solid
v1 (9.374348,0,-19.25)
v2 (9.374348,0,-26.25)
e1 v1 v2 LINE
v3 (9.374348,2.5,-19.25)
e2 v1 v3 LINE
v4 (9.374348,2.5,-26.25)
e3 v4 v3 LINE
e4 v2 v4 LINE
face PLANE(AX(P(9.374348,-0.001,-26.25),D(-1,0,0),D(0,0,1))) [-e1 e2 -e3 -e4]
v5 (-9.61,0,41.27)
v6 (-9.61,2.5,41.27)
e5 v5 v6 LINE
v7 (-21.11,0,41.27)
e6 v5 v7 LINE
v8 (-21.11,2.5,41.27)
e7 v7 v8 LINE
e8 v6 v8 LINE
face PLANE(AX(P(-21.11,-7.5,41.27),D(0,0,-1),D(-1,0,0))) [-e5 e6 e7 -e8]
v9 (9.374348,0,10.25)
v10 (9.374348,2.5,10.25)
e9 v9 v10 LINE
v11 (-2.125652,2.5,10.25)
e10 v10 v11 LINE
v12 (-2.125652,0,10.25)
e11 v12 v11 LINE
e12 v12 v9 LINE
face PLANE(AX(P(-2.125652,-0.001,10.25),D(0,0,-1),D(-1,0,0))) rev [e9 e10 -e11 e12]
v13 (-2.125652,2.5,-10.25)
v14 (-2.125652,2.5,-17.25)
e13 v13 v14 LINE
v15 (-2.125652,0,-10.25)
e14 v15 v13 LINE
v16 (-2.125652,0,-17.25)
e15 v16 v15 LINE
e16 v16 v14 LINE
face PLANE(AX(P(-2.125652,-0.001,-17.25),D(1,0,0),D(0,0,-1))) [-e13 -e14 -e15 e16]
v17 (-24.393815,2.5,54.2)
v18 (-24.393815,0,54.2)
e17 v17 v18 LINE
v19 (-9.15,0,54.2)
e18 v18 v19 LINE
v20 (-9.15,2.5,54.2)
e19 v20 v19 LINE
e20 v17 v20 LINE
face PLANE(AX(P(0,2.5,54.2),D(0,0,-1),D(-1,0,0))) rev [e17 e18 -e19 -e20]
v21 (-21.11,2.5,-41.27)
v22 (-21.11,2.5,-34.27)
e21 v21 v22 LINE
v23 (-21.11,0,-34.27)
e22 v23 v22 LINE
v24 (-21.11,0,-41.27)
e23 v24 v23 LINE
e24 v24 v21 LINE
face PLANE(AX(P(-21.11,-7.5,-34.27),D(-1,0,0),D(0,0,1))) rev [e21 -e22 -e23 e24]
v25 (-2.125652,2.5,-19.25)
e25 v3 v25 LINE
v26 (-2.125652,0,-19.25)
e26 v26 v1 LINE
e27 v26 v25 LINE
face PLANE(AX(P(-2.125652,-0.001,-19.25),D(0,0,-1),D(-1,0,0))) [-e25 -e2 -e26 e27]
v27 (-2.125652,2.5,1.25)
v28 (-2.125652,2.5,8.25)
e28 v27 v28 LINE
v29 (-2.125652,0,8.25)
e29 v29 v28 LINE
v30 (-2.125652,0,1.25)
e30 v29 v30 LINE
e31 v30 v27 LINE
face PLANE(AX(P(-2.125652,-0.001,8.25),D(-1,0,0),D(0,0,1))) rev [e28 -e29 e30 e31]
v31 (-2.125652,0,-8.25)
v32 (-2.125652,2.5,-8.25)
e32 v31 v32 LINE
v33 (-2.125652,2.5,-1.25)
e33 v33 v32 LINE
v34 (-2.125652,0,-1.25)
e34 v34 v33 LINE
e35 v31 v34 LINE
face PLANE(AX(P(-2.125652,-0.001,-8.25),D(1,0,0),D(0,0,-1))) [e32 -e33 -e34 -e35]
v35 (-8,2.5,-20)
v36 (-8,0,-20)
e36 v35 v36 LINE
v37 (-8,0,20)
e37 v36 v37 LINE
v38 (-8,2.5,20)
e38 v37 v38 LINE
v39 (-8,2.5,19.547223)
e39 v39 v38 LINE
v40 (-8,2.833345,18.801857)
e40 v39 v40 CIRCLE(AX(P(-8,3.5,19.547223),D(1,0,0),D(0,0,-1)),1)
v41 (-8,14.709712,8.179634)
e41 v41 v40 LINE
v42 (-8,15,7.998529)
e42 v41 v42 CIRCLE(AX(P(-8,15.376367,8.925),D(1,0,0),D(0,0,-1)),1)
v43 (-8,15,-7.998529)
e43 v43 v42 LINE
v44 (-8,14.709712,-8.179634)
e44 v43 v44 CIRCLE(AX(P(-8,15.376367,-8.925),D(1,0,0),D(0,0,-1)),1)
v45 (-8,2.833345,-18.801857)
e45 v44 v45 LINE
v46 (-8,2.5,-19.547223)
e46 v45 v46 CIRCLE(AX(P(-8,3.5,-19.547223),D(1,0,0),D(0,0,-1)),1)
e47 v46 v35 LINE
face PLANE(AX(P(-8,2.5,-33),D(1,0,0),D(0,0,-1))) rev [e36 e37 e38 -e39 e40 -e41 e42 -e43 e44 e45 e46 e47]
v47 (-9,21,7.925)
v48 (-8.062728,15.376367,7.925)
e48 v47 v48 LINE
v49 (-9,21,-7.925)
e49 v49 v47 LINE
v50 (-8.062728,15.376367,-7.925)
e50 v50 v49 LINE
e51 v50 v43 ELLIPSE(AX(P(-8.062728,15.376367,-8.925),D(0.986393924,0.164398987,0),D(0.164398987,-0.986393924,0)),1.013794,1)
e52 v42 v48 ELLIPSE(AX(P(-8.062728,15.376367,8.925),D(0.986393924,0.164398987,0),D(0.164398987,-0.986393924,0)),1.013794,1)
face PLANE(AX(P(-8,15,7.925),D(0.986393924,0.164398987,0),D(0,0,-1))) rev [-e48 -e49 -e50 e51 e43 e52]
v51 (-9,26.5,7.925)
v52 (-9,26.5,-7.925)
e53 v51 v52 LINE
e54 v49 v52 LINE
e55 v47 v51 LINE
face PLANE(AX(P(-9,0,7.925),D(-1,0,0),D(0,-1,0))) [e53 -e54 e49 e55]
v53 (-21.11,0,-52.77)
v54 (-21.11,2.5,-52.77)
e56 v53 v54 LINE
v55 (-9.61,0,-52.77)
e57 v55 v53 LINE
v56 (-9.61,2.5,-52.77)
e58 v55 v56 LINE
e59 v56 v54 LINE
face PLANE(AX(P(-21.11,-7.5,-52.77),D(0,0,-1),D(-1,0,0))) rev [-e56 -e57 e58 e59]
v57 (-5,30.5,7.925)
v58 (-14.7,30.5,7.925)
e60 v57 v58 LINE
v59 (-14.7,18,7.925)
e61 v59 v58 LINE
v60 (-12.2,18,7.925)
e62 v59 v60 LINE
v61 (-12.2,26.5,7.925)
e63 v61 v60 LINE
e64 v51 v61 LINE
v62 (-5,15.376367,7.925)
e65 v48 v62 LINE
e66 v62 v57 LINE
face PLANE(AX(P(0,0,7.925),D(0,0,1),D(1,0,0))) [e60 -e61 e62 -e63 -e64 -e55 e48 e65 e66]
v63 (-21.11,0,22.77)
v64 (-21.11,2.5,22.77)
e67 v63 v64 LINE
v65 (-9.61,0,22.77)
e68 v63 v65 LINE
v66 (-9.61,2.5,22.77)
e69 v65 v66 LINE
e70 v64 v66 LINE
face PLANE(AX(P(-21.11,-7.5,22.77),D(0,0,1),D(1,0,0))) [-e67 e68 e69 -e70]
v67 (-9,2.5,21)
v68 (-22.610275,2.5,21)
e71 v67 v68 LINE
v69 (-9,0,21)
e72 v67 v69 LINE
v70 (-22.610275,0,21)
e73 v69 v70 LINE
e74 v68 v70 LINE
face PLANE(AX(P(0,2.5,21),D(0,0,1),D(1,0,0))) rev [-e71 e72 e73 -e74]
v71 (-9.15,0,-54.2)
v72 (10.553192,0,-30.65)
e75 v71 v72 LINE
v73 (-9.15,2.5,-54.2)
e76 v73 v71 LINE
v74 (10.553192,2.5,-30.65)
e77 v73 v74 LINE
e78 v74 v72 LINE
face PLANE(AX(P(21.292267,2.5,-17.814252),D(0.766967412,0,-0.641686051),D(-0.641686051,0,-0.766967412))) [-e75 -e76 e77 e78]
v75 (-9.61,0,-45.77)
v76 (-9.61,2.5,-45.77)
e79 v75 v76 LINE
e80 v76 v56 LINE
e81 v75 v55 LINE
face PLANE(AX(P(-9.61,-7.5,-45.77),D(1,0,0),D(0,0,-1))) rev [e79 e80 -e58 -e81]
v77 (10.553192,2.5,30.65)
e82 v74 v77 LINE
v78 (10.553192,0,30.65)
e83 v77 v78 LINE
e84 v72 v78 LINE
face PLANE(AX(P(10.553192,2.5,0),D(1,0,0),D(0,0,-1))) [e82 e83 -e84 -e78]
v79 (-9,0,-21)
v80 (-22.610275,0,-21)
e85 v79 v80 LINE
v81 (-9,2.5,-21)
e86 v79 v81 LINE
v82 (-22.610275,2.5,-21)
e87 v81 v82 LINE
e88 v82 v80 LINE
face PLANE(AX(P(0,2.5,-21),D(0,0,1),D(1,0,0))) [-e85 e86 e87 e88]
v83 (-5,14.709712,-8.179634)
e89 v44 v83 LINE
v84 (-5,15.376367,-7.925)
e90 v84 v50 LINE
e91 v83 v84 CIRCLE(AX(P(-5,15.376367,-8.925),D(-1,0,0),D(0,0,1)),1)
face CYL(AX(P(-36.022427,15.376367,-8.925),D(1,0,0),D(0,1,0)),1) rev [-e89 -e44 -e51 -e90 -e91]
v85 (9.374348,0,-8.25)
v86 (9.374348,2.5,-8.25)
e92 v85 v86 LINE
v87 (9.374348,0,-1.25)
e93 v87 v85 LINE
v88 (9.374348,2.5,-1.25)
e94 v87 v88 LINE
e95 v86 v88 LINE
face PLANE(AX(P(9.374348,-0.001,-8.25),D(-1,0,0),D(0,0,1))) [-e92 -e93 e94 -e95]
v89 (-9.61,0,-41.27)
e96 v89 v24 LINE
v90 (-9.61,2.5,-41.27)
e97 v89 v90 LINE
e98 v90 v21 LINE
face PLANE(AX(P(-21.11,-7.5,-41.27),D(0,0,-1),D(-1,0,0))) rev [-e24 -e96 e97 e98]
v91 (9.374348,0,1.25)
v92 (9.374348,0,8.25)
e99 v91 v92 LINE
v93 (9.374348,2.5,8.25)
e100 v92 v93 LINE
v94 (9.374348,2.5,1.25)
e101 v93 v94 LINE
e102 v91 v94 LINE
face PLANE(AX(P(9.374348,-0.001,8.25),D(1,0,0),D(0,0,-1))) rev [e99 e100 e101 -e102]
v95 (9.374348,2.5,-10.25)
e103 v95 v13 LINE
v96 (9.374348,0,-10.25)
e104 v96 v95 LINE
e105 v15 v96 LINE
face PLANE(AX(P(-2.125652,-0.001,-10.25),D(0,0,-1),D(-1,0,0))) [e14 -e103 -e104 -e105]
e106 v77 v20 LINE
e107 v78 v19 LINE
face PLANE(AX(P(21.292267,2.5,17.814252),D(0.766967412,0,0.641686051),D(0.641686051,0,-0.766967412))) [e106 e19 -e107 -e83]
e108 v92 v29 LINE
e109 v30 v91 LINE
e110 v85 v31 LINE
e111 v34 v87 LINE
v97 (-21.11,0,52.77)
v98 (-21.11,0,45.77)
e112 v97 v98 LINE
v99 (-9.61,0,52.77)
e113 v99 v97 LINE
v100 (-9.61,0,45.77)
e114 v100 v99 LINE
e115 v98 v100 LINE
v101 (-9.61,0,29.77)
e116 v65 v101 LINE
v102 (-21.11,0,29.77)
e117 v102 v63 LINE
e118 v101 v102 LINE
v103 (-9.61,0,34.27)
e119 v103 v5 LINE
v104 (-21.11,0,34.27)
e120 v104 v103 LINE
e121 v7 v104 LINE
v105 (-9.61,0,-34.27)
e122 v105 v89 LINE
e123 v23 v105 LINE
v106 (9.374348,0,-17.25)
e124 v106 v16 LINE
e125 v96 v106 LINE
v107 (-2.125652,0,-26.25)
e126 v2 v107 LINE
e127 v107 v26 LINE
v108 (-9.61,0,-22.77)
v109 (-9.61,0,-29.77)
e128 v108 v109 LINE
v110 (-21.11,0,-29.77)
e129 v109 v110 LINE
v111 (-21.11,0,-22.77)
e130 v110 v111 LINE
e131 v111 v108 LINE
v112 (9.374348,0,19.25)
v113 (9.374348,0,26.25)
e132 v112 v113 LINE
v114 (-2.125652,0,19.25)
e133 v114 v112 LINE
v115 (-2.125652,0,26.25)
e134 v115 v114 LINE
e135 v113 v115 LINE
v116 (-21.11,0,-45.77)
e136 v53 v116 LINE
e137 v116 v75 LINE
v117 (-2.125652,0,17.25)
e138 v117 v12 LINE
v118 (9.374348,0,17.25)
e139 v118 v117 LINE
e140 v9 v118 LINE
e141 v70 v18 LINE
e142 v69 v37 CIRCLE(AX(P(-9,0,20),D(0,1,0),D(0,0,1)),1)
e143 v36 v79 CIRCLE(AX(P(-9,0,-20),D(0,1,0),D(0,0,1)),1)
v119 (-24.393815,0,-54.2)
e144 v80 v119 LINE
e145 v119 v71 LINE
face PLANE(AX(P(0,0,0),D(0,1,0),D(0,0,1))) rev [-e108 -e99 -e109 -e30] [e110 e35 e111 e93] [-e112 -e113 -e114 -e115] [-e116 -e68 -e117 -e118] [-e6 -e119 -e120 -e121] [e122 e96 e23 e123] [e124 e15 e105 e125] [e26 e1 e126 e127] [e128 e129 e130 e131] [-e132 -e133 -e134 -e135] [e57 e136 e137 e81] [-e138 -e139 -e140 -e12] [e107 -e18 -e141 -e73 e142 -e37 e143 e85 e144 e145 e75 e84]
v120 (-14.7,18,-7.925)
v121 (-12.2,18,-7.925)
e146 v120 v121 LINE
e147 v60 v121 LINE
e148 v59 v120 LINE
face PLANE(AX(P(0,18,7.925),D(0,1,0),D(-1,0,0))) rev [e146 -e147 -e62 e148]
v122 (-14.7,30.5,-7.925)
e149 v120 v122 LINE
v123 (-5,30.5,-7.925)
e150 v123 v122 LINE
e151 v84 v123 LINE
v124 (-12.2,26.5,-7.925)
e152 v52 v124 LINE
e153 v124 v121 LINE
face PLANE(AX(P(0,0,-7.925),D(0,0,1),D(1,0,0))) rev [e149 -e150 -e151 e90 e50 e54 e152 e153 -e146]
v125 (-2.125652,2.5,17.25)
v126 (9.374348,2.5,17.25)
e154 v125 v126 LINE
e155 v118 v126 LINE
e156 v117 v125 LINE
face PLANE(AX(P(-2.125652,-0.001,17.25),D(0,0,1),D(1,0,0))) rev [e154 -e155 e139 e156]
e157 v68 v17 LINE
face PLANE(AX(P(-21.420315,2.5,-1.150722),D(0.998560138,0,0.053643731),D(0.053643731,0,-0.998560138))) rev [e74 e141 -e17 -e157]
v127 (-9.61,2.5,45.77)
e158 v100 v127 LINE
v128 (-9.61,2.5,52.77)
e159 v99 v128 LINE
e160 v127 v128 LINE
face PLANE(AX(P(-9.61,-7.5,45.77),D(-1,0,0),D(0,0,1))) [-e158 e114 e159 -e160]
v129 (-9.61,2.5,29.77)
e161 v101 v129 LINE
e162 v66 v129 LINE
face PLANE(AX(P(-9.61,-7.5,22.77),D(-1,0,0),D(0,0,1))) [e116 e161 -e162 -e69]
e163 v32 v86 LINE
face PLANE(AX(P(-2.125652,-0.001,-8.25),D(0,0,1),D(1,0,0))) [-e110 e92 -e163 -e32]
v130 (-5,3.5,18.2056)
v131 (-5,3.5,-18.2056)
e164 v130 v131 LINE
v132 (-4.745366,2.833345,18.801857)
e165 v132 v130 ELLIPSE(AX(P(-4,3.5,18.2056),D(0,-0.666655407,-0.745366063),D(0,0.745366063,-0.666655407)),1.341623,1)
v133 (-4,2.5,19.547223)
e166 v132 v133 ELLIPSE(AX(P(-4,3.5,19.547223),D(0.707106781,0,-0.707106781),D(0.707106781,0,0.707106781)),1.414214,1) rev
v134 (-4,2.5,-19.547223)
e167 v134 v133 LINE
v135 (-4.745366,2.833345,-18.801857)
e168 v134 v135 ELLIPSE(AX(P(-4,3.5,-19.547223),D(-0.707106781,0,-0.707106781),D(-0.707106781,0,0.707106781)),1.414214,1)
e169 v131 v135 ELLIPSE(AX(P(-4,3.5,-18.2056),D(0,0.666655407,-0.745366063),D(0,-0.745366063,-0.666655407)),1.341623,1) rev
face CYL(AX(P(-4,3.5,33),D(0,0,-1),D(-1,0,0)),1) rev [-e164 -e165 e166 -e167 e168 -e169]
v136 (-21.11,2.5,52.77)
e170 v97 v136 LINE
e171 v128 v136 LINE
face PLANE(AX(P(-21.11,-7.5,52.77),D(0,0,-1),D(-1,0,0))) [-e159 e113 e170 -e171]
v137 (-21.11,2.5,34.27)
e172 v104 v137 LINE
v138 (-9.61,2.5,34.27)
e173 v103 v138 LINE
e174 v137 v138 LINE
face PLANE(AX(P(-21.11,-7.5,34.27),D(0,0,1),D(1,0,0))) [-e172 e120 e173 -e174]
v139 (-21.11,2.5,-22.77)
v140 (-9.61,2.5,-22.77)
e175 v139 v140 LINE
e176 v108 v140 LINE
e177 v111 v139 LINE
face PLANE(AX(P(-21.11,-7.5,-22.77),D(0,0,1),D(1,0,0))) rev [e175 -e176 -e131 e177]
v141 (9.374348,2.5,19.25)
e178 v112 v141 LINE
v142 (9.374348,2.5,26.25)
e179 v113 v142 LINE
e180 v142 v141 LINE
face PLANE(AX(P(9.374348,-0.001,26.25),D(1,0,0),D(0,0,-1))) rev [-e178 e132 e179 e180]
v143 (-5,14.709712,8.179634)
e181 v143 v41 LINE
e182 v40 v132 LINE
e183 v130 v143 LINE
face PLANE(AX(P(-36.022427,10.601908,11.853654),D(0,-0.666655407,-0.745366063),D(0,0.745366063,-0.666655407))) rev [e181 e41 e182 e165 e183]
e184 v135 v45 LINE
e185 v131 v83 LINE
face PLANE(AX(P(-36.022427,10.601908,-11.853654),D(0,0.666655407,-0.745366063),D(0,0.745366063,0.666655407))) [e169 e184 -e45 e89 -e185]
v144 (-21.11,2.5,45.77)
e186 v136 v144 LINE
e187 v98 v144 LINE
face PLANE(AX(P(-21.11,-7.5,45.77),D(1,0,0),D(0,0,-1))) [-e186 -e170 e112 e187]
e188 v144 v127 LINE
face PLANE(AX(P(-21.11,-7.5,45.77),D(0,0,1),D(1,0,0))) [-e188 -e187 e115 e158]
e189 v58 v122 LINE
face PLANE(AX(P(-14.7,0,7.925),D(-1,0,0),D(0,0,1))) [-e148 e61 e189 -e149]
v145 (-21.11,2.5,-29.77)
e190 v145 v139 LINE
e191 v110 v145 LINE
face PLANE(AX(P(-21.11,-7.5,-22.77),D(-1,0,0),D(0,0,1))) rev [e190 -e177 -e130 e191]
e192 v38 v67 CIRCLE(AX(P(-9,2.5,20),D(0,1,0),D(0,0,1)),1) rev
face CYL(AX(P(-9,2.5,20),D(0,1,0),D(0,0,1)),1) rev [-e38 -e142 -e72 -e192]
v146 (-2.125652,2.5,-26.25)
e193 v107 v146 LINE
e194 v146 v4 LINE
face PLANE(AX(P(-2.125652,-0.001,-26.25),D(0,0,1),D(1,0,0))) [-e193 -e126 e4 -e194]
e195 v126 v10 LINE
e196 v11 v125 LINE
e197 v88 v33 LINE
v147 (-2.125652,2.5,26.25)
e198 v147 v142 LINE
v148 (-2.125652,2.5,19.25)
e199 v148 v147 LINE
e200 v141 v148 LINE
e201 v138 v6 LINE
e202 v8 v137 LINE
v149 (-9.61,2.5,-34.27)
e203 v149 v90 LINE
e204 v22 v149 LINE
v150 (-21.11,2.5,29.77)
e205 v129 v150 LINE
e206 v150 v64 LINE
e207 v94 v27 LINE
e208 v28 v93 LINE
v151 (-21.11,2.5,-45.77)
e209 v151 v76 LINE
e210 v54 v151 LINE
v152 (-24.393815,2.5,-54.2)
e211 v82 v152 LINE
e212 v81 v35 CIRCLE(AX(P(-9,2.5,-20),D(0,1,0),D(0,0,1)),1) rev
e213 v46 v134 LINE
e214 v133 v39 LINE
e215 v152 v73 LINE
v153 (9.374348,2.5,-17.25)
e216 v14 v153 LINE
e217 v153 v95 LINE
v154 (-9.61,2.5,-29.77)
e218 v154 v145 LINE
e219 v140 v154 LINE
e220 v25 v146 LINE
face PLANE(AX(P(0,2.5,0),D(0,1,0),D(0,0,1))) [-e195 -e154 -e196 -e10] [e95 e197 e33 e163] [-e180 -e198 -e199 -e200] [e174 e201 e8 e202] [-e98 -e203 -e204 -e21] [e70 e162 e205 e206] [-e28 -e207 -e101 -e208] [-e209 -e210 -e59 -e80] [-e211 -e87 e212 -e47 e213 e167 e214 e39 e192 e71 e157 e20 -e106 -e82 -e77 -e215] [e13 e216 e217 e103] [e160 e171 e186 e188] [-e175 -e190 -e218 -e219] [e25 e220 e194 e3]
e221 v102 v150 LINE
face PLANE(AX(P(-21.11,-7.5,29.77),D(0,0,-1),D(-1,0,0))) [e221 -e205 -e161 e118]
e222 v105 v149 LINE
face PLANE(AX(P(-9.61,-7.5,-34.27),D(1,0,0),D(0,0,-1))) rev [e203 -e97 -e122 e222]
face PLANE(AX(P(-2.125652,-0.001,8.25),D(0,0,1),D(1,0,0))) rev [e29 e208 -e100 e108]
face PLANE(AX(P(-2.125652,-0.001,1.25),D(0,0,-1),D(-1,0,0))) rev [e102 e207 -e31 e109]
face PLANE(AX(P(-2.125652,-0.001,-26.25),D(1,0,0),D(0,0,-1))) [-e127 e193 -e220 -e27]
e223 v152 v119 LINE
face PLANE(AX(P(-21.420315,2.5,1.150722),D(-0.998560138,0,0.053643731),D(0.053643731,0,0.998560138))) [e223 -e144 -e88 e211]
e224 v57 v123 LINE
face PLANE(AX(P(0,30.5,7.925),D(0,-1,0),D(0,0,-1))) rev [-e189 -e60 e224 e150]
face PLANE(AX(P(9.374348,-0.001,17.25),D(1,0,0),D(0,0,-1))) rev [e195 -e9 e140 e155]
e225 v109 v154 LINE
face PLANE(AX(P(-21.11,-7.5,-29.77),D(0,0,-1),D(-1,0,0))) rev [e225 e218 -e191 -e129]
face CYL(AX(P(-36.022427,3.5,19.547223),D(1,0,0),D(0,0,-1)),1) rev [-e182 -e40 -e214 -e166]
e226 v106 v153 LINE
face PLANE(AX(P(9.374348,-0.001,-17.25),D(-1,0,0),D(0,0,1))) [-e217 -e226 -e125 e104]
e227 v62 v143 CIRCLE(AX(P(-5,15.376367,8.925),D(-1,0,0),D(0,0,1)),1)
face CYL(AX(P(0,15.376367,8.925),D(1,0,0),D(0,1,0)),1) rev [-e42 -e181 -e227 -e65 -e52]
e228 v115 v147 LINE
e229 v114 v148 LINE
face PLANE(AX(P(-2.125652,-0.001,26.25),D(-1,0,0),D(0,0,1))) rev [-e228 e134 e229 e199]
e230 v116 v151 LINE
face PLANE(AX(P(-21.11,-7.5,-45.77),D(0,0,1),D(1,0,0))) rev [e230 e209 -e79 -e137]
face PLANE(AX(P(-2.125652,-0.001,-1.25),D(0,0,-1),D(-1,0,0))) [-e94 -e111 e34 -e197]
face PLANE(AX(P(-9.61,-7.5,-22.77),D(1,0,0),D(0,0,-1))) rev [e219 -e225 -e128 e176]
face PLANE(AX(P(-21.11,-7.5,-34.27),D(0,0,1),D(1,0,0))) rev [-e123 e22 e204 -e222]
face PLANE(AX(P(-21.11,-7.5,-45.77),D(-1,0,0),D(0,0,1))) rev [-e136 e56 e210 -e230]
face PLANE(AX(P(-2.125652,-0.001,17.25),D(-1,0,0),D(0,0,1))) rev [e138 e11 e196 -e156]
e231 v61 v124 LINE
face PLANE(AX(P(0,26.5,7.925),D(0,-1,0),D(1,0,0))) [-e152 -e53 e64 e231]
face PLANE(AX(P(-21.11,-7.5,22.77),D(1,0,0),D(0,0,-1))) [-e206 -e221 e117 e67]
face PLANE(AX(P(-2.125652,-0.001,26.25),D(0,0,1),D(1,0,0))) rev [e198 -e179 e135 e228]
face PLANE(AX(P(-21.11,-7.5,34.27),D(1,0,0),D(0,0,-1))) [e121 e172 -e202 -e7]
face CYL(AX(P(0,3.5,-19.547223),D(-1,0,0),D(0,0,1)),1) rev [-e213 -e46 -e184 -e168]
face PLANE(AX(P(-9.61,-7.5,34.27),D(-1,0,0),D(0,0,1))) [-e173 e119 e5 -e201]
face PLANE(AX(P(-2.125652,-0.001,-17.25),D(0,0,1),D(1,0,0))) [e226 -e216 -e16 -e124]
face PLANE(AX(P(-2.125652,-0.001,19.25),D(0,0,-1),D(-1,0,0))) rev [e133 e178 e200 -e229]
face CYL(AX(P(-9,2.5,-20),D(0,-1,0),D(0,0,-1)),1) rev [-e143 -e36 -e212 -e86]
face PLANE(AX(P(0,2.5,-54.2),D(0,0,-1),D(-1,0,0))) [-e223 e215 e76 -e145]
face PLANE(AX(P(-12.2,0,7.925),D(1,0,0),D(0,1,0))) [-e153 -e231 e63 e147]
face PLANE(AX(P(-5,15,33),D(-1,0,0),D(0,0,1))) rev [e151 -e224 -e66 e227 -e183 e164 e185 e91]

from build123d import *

# Parameters (mm, degrees)
RESSALTO_EXTRUS_O1_DEPTH  = 2.5
ESBO_O2_W                 = 3
ESBO_O2_H                 = 66
RESSALTO_EXTRUS_O2_DEPTH  = 12.5
ESBO_O4_W                 = 4
ESBO_O4_H                 = 11.5
ESBO_O4_W_2               = 2.5
ESBO_O4_H_2               = 8.5
RESSALTO_EXTRUS_O4_DEPTH  = 7.925
CHANFRO1_SIZE2            = 6
CHANFRO1_SIZE             = 1
CHANFRO2_SIZE             = 12
CORTE_EXTRUS_O2_DEPTH     = 3
CORTE_EXTRUS_O1_REACH     = 67.702
ESBO_O5_W                 = 11.5
ESBO_O5_H                 = 7
PADR_O_LINEAR1_COUNT      = 3
PADR_O_LINEAR1_PITCH      = 9
ESBO_O8_W                 = 11.5
ESBO_O8_H                 = 7
CORTE_EXTRUS_O4_DEPTH     = 10
PADR_O_LINEAR3_COUNT      = 3
PADR_O_LINEAR3_PITCH      = 11.5
ESPELHAR1_COPY_1_SKETCH_W = 11.5
ESPELHAR1_COPY_1_SKETCH_H = 7
ESPELHAR1_COPY_1_DEPTH    = 10
ESPELHAR1_COPY_2_SKETCH_W = 11.5
ESPELHAR1_COPY_2_SKETCH_H = 7
ESPELHAR1_COPY_2_DEPTH    = 10
ESPELHAR2_COPY_1_REACH    = 67.702
ESPELHAR2_COPY_1_SKETCH_W = 11.5
ESPELHAR2_COPY_1_SKETCH_H = 7
ESPELHAR2_COPY_2_REACH    = 67.702
ESPELHAR2_COPY_2_SKETCH_W = 11.5
ESPELHAR2_COPY_2_SKETCH_H = 7
FILETE3_R                 = 1
FILETE5_R                 = 1


# Some blends are built 0.0001 mm under size
with BuildPart() as part:
    # Esboço1 → Ressalto-extrusão1 (new body)
    with BuildSketch(Plane(origin=(0, 0, 0), x_dir=(1, 0, 0), z_dir=(0, 1, 0))):
        Polygon((-24.393815238, -54.2), (-9.15, -54.2), (10.553192421, -30.65), (10.553192421, 30.65), (-9.15, 54.2), (-24.393815238, 54.2), (-22.610275313, 21), (-8, 21), (-8, -21), (-22.610275313, -21), align=None)
    extrude(amount=RESSALTO_EXTRUS_O1_DEPTH)

    # Esboço2 → Ressalto-extrusão2 (add)
    with BuildSketch(Plane(origin=(0, 2.5, 0), x_dir=(1, 0, 0), z_dir=(0, 1, 0))):
        with Locations((-6.5, 0)):
            Rectangle(ESBO_O2_W, ESBO_O2_H)
    extrude(amount=RESSALTO_EXTRUS_O2_DEPTH)

    # Esboço4 → Ressalto-extrusão4 (add, symmetric)
    with BuildSketch(Plane.XY):
        with Locations((-7, 20.75)):
            Rectangle(ESBO_O4_W, ESBO_O4_H)
        Polygon((-9, 26.5), (-5, 26.5), (-5, 30.5), (-14.7, 30.5), (-14.7, 26.5), (-12.2, 26.5), align=None)
        with Locations((-13.45, 22.25)):
            Rectangle(ESBO_O4_W_2, ESBO_O4_H_2)
    extrude(amount=RESSALTO_EXTRUS_O4_DEPTH, both=True)

    # Chanfro1
    chanfro1_edges = [part.edges().sort_by_distance(p)[0] for p in [
        (-9, 15, 0),
    ]]
    chanfro1_side = [part.faces().sort_by_distance(p)[0] for p in [
        (-8.98, 15, 0),
    ]]
    chamfer(chanfro1_edges, length=CHANFRO1_SIZE - 0.0001, length2=CHANFRO1_SIZE2 - 0.0001, reference=chanfro1_side[0])  # a hair under: the kernel refuses the full size

    # Chanfro2
    chanfro2_edges = [part.edges().sort_by_distance(p)[0] for p in [
        (-6.5, 15, 33),
        (-6.5, 15, -33),
    ]]
    chamfer(chanfro2_edges, length=CHANFRO2_SIZE)

    # Esboço6 → Corte-extrusão2 (cut)
    with BuildSketch(Plane(origin=(-5, 0, 0), x_dir=(0, 0, -1), z_dir=(1, 0, 0))):
        Polygon((-7.92, 15), (-33, 15), (-33, 2.5), (-19.1, 2.5), align=None)
    corte_extrus_o2 = extrude(amount=-CORTE_EXTRUS_O2_DEPTH, mode=Mode.SUBTRACT)

    # Esboço5 → Corte-extrusão1 (cut, up to next)
    with BuildSketch(Plane(origin=(0, 2.5, 0), x_dir=(1, 0, 0), z_dir=(0, 1, 0)), mode=Mode.PRIVATE) as corte_extrus_o1_sk1:
        with Locations((3.624348025, -4.75)):
            Rectangle(ESBO_O5_W, ESBO_O5_H)
    corte_extrus_o1_tool1 = extrude(corte_extrus_o1_sk1.sketch, amount=-CORTE_EXTRUS_O1_REACH, mode=Mode.PRIVATE) & part.part
    corte_extrus_o1 = corte_extrus_o1_tool1.solids().sort_by_distance((3.624348, 2.5, 4.75))[0]
    add(corte_extrus_o1, mode=Mode.SUBTRACT)

    # Padrão linear1: Corte-extrusão1 ×3
    with Locations(*[(0, 0, i * PADR_O_LINEAR1_PITCH) for i in range(1, PADR_O_LINEAR1_COUNT)]):
        add(corte_extrus_o1, mode=Mode.SUBTRACT)

    # Esboço8 → Corte-extrusão4 (cut)
    with BuildSketch(Plane(origin=(0, 2.5, 0), x_dir=(1, 0, 0), z_dir=(0, 1, 0))):
        with Locations((-15.36, 26.27)):
            Rectangle(ESBO_O8_W, ESBO_O8_H)
    corte_extrus_o4 = extrude(amount=-CORTE_EXTRUS_O4_DEPTH, mode=Mode.SUBTRACT)

    # Padrão linear3: Corte-extrusão4 ×3
    with Locations(*[(0, 0, -i * PADR_O_LINEAR3_PITCH) for i in range(1, PADR_O_LINEAR3_COUNT)]):
        add(corte_extrus_o4, mode=Mode.SUBTRACT)

    # Espelhar1: Corte-extrusão4 across plane
    add(corte_extrus_o4.mirror(Plane.XY), mode=Mode.SUBTRACT)

    # Espelhar1 copy 1 sketch → Espelhar1 copy 1 (cut)
    with BuildSketch(Plane(origin=(0, 2.5, 11.5), x_dir=(1, 0, 0), z_dir=(0, 1, 0))):
        with Locations((-15.36, -26.27)):
            Rectangle(ESPELHAR1_COPY_1_SKETCH_W, ESPELHAR1_COPY_1_SKETCH_H)
    extrude(amount=-ESPELHAR1_COPY_1_DEPTH, mode=Mode.SUBTRACT)

    # Espelhar1 copy 2 sketch → Espelhar1 copy 2 (cut)
    with BuildSketch(Plane(origin=(0, 2.5, 23), x_dir=(1, 0, 0), z_dir=(0, 1, 0))):
        with Locations((-15.36, -26.27)):
            Rectangle(ESPELHAR1_COPY_2_SKETCH_W, ESPELHAR1_COPY_2_SKETCH_H)
    extrude(amount=-ESPELHAR1_COPY_2_DEPTH, mode=Mode.SUBTRACT)

    # Espelhar2: Corte-extrusão1 across plane
    add(corte_extrus_o1.mirror(Plane.XY), mode=Mode.SUBTRACT)

    # Espelhar2 copy 1 sketch → Espelhar2 copy 1 (cut, up to next)
    with BuildSketch(Plane(origin=(0, 2.5, -9), x_dir=(1, 0, 0), z_dir=(0, 1, 0)), mode=Mode.PRIVATE) as espelhar2_copy_1_sk1:
        with Locations((3.624348025, 4.75)):
            Rectangle(ESPELHAR2_COPY_1_SKETCH_W, ESPELHAR2_COPY_1_SKETCH_H)
    espelhar2_copy_1_tool1 = extrude(espelhar2_copy_1_sk1.sketch, amount=-ESPELHAR2_COPY_1_REACH, mode=Mode.PRIVATE) & part.part
    add(espelhar2_copy_1_tool1.solids().sort_by_distance((3.624348, 2.5, -13.75))[0], mode=Mode.SUBTRACT)

    # Espelhar2 copy 2 sketch → Espelhar2 copy 2 (cut, up to next)
    with BuildSketch(Plane(origin=(0, 2.5, -18), x_dir=(1, 0, 0), z_dir=(0, 1, 0)), mode=Mode.PRIVATE) as espelhar2_copy_2_sk1:
        with Locations((3.624348025, 4.75)):
            Rectangle(ESPELHAR2_COPY_2_SKETCH_W, ESPELHAR2_COPY_2_SKETCH_H)
    espelhar2_copy_2_tool1 = extrude(espelhar2_copy_2_sk1.sketch, amount=-ESPELHAR2_COPY_2_REACH, mode=Mode.PRIVATE) & part.part
    add(espelhar2_copy_2_tool1.solids().sort_by_distance((3.624348, 2.5, -22.75))[0], mode=Mode.SUBTRACT)

    # Espelhar3: Corte-extrusão2 across plane
    add(corte_extrus_o2.mirror(Plane.XY), mode=Mode.SUBTRACT)

    # Filete3
    # the kernel refuses this fillet: 1 mm, written as the material it adds along each edge
    with BuildSketch(Plane(origin=(-8, 0, 21), x_dir=(-1, 0, 0), z_dir=(0, 1, 0)), Plane(origin=(-8, 0, -21), x_dir=(0, 0, 1), z_dir=(0, 1, 0))) as filete3_piece_1:
        with BuildLine():
            CenterArc((FILETE3_R, -FILETE3_R), FILETE3_R, 90, 90)
            Line((0, -FILETE3_R), (0, 0))
            Line((0, 0), (FILETE3_R, 0))
        make_face()
    extrude(amount=2.5)
    with BuildSketch(Plane(origin=(-5, 2.5, 19.1), x_dir=(0, 0, 1), z_dir=(-1, 0, 0))) as filete3_piece_2:
        with BuildLine():
            CenterArc((FILETE3_R * 0.44722265932, FILETE3_R), FILETE3_R, 221.809449368, 48.190550632)
            Line((-FILETE3_R * 0.298143403972, FILETE3_R * 0.333344592992), (0, 0))
            Line((0, 0), (FILETE3_R * 0.44722265932, 0))
        make_face()
    extrude(amount=3)
    with BuildSketch(Plane(origin=(-5, 2.5, -19.1), x_dir=(0, 0, -1), z_dir=(-1, 0, 0))) as filete3_piece_3:
        with BuildLine():
            CenterArc((FILETE3_R * 0.44722265932, -FILETE3_R), FILETE3_R, 90, 48.190550632)
            Line((-FILETE3_R * 0.298143403972, -FILETE3_R * 0.333344592992), (0, 0))
            Line((0, 0), (FILETE3_R * 0.44722265932, 0))
        make_face()
    extrude(amount=3)
    with BuildSketch(Plane(origin=(-5, 2.5, 21.6), x_dir=(1, 0, 0), z_dir=(0, 0, -1))) as filete3_piece_4_section:
        with BuildLine():
            CenterArc((FILETE3_R, -FILETE3_R), FILETE3_R, 90, 90)
            Line((0, -FILETE3_R), (0, 0))
            Line((0, 0), (FILETE3_R, 0))
        make_face()
    filete3_piece_4 = extrude(amount=43.2, mode=Mode.PRIVATE)
    filete3_piece_4 = split(filete3_piece_4, bisect_by=Plane(origin=(-5, 1.257744209, 20.211073579), z_dir=(0, -0.6666554070080641, -0.7453660632916638)), keep=Keep.TOP, mode=Mode.PRIVATE)
    filete3_piece_4 = split(filete3_piece_4, bisect_by=Plane(origin=(-5, 22.723924273, -1.01172213), z_dir=(0, -0.6666554070080641, 0.7453660632916638)), keep=Keep.TOP, mode=Mode.PRIVATE)
    add(filete3_piece_4)
    with BuildSketch(Plane(origin=(-5, 2.5, 21.6), x_dir=(1, 0, 0), z_dir=(0, 0, -1))) as filete3_piece_5a_section:
        with BuildLine():
            CenterArc((FILETE3_R, -FILETE3_R), FILETE3_R, 90, 90)
            Line((0, -FILETE3_R), (0, 0))
            Line((0, 0), (FILETE3_R, 0))
        make_face()
    filete3_piece_5a = extrude(amount=43.2, mode=Mode.PRIVATE)
    filete3_piece_5a = split(filete3_piece_5a, bisect_by=Plane(origin=(-5, 1.257744209, 20.211073579), z_dir=(0, 0.6666554070080641, 0.7453660632916638)), keep=Keep.TOP, mode=Mode.PRIVATE)
    with BuildSketch(Plane(origin=(-3.881943352, 2.5, 19.1), x_dir=(0, 0, 1), z_dir=(-1, 0, 0))) as filete3_piece_5b_section:
        with BuildLine():
            CenterArc((FILETE3_R * 0.44722265932, FILETE3_R), FILETE3_R, 221.809449368, 48.190550632)
            Line((-FILETE3_R * 0.298143403972, FILETE3_R * 0.333344592992), (0, 0))
            Line((0, 0), (FILETE3_R * 0.44722265932, 0))
        make_face()
    filete3_piece_5b = extrude(amount=4.118056648, mode=Mode.PRIVATE)
    filete3_piece_5b = split(filete3_piece_5b, bisect_by=Plane(origin=(-5, 2.5, 19.1), z_dir=(1, 0, 0)), keep=Keep.TOP, mode=Mode.PRIVATE)
    filete3_piece_5 = filete3_piece_5a & filete3_piece_5b
    add(filete3_piece_5)
    with BuildSketch(Plane(origin=(-3.881943352, 2.5, -19.1), x_dir=(0, 0, -1), z_dir=(-1, 0, 0))) as filete3_piece_6a_section:
        with BuildLine():
            CenterArc((FILETE3_R * 0.44722265932, -FILETE3_R), FILETE3_R, 90, 48.190550632)
            Line((-FILETE3_R * 0.298143403972, -FILETE3_R * 0.333344592992), (0, 0))
            Line((0, 0), (FILETE3_R * 0.44722265932, 0))
        make_face()
    filete3_piece_6a = extrude(amount=4.118056648, mode=Mode.PRIVATE)
    filete3_piece_6a = split(filete3_piece_6a, bisect_by=Plane(origin=(-5, 2.5, -19.1), z_dir=(1, 0, 0)), keep=Keep.TOP, mode=Mode.PRIVATE)
    with BuildSketch(Plane(origin=(-5, 2.5, 21.6), x_dir=(1, 0, 0), z_dir=(0, 0, -1))) as filete3_piece_6b_section:
        with BuildLine():
            CenterArc((FILETE3_R, -FILETE3_R), FILETE3_R, 90, 90)
            Line((0, -FILETE3_R), (0, 0))
            Line((0, 0), (FILETE3_R, 0))
        make_face()
    filete3_piece_6b = extrude(amount=43.2, mode=Mode.PRIVATE)
    filete3_piece_6b = split(filete3_piece_6b, bisect_by=Plane(origin=(-5, 22.723924273, -1.01172213), z_dir=(0, 0.6666554070080641, -0.7453660632916638)), keep=Keep.TOP, mode=Mode.PRIVATE)
    filete3_piece_6 = filete3_piece_6a & filete3_piece_6b
    add(filete3_piece_6)
    # the kernel refuses this fillet: 1 mm, written as the material it takes off along each edge
    with BuildSketch(Plane(origin=(-4.750312696, 15, -7.925), x_dir=(0, 0, 1), z_dir=(-1, 0, 0))) as filete3_2_piece_1:
        with BuildLine():
            CenterArc((1, 0.099874922), FILETE3_R, 180, 5.731967965)
            Line((0, 0.099874922), (0, 0))
            Line((0, 0), (0.005, 0))
        make_face()
    extrude(amount=3.499374609, mode=Mode.SUBTRACT)
    with BuildSketch(Plane(origin=(-4.750312696, 15, 7.925), x_dir=(0, 0, -1), z_dir=(-1, 0, 0))) as filete3_2_piece_2:
        with BuildLine():
            CenterArc((1, -0.099874922), FILETE3_R, 174.268032035, 5.731967965)
            Line((0, -0.099874922), (0, 0))
            Line((0, 0), (0.005, 0))
        make_face()
    extrude(amount=3.499374609, mode=Mode.SUBTRACT)

    # Filete5
    # the kernel refuses this fillet: 1 mm, written as the material it adds along each edge
    with BuildSketch(Plane(origin=(-5, 15, -7.92), x_dir=(0, -0.7453660632967485, -0.666655407002379), z_dir=(-1, 0, 0))) as filete5_piece_1_section:
        with BuildLine():
            CenterArc((0.389457483, -1), FILETE5_R, 90, 41.809449368)
            Line((-0.277197924, -0.254633937), (-0.343863465, -0.18009733))
            ThreePointArc((-0.343863465, -0.18009733), (-0.137775641, 0.004227619), (-0.073776551, 0.067505708))
            Line((-0.073776551, 0.067505708), (0, 0.1))
            Line((0, 0.1), (0.389457483, 0.1))
            Line((0.389457483, 0.1), (0.389457483, 0))
        make_face()
    filete5_piece_1 = extrude(amount=3, mode=Mode.PRIVATE)
    filete5_piece_1 = split(filete5_piece_1, bisect_by=Plane(origin=(-5, 15, -7.92), z_dir=(0, -1, 0)), keep=Keep.TOP, mode=Mode.PRIVATE)
    filete5_piece_1 = split(filete5_piece_1, bisect_by=Plane(origin=(-7.919029365, 14.513535649, -7.92), z_dir=(0.9863961453920427, 0.1643856573905407, 0)), keep=Keep.TOP, mode=Mode.PRIVATE)
    add(filete5_piece_1)
    with BuildSketch(Plane(origin=(-5, 15, -7.92), x_dir=(0, -0.7453660632967485, -0.666655407002379), z_dir=(-1, 0, 0))) as filete5_piece_2_section:
        with BuildLine():
            CenterArc((0.389457483, -1), FILETE5_R, 90, 41.809449368)
            Line((-0.277197924, -0.254633937), (-0.343863465, -0.18009733))
            ThreePointArc((-0.343863465, -0.18009733), (-0.137775641, 0.004227619), (-0.073776551, 0.067505708))
            Line((-0.073776551, 0.067505708), (0, 0.1))
            Line((0, 0.1), (0.389457483, 0.1))
            Line((0.389457483, 0.1), (0.389457483, 0))
        make_face()
    filete5_piece_2 = extrude(amount=3, mode=Mode.PRIVATE)
    filete5_piece_2 = split(filete5_piece_2, bisect_by=Plane(origin=(-5, 15, -7.92), z_dir=(0, 1, 0)), keep=Keep.TOP, mode=Mode.PRIVATE)
    add(filete5_piece_2)
    with BuildSketch(Plane(origin=(-5, 15, -7.92), x_dir=(0, -0.7453660632967485, -0.666655407002379), z_dir=(-1, 0, 0))) as filete5_piece_3_section:
        with BuildLine():
            CenterArc((0.389457483, -1), FILETE5_R, 90, 41.809449368)
            Line((-0.277197924, -0.254633937), (-0.343863465, -0.18009733))
            ThreePointArc((-0.343863465, -0.18009733), (-0.137775641, 0.004227619), (-0.073776551, 0.067505708))
            Line((-0.073776551, 0.067505708), (0, 0.1))
            Line((0, 0.1), (0.389457483, 0.1))
            Line((0.389457483, 0.1), (0.389457483, 0))
        make_face()
    filete5_piece_3 = extrude(amount=3, mode=Mode.PRIVATE)
    filete5_piece_3 = split(filete5_piece_3, bisect_by=Plane(origin=(-7.919029365, 14.513535649, -7.92), z_dir=(-0.9863961453920427, -0.1643856573905407, 0)), keep=Keep.TOP, mode=Mode.PRIVATE)
    add(filete5_piece_3)
    with BuildSketch(Plane(origin=(-5, 15, -7.92), x_dir=(0, -0.7453660632967485, -0.666655407002379), z_dir=(-1, 0, 0))) as filete5_piece_4_section:
        with BuildLine():
            CenterArc((0.389457483, -1), FILETE5_R, 90, 41.809449368)
            Line((-0.277197924, -0.254633937), (-0.343863465, -0.18009733))
            ThreePointArc((-0.343863465, -0.18009733), (-0.137775641, 0.004227619), (-0.073776551, 0.067505708))
            Line((-0.073776551, 0.067505708), (0, 0.1))
            Line((0, 0.1), (0.389457483, 0.1))
            Line((0.389457483, 0.1), (0.389457483, 0))
        make_face()
    filete5_piece_4 = extrude(amount=3.973643707, mode=Mode.PRIVATE)
    filete5_piece_4 = split(filete5_piece_4, bisect_by=Plane(origin=(-8, 15, -7.92), z_dir=(-1, 0, 0)), keep=Keep.TOP, mode=Mode.PRIVATE)
    filete5_piece_4 = split(filete5_piece_4, bisect_by=Plane(origin=(-7.919029365, 14.513535649, -7.92), z_dir=(0.9863961453920427, 0.1643856573905407, 0)), keep=Keep.TOP, mode=Mode.PRIVATE)
    add(filete5_piece_4)
    with BuildSketch(Plane(origin=(-5, 15, 7.92), x_dir=(0, -0.7453660632826157, 0.6666554070181805), z_dir=(-1, 0, 0))) as filete5_piece_5_section:
        with BuildLine():
            CenterArc((0.389457483, 1), FILETE5_R, 228.190550632, 41.809449368)
            Line((-0.277197924, 0.254633937), (-0.343863465, 0.18009733))
            ThreePointArc((-0.343863465, 0.18009733), (-0.137775641, -0.004227619), (-0.073776551, -0.067505708))
            Line((-0.073776551, -0.067505708), (0, -0.1))
            Line((0, -0.1), (0.389457483, -0.1))
            Line((0.389457483, -0.1), (0.389457483, 0))
        make_face()
    filete5_piece_5 = extrude(amount=3, mode=Mode.PRIVATE)
    filete5_piece_5 = split(filete5_piece_5, bisect_by=Plane(origin=(-5, 15, 7.92), z_dir=(0, -1, 0)), keep=Keep.TOP, mode=Mode.PRIVATE)
    filete5_piece_5 = split(filete5_piece_5, bisect_by=Plane(origin=(-7.919029365, 14.513535649, 7.92), z_dir=(0.9863961453920427, 0.1643856573905407, 0)), keep=Keep.TOP, mode=Mode.PRIVATE)
    add(filete5_piece_5)
    with BuildSketch(Plane(origin=(-5, 15, 7.92), x_dir=(0, -0.7453660632826157, 0.6666554070181805), z_dir=(-1, 0, 0))) as filete5_piece_6_section:
        with BuildLine():
            CenterArc((0.389457483, 1), FILETE5_R, 228.190550632, 41.809449368)
            Line((-0.277197924, 0.254633937), (-0.343863465, 0.18009733))
            ThreePointArc((-0.343863465, 0.18009733), (-0.137775641, -0.004227619), (-0.073776551, -0.067505708))
            Line((-0.073776551, -0.067505708), (0, -0.1))
            Line((0, -0.1), (0.389457483, -0.1))
            Line((0.389457483, -0.1), (0.389457483, 0))
        make_face()
    filete5_piece_6 = extrude(amount=3, mode=Mode.PRIVATE)
    filete5_piece_6 = split(filete5_piece_6, bisect_by=Plane(origin=(-5, 15, 7.92), z_dir=(0, 1, 0)), keep=Keep.TOP, mode=Mode.PRIVATE)
    add(filete5_piece_6)
    with BuildSketch(Plane(origin=(-5, 15, 7.92), x_dir=(0, -0.7453660632826157, 0.6666554070181805), z_dir=(-1, 0, 0))) as filete5_piece_7_section:
        with BuildLine():
            CenterArc((0.389457483, 1), FILETE5_R, 228.190550632, 41.809449368)
            Line((-0.277197924, 0.254633937), (-0.343863465, 0.18009733))
            ThreePointArc((-0.343863465, 0.18009733), (-0.137775641, -0.004227619), (-0.073776551, -0.067505708))
            Line((-0.073776551, -0.067505708), (0, -0.1))
            Line((0, -0.1), (0.389457483, -0.1))
            Line((0.389457483, -0.1), (0.389457483, 0))
        make_face()
    filete5_piece_7 = extrude(amount=3, mode=Mode.PRIVATE)
    filete5_piece_7 = split(filete5_piece_7, bisect_by=Plane(origin=(-7.919029365, 14.513535649, 7.92), z_dir=(-0.9863961453920427, -0.1643856573905407, 0)), keep=Keep.TOP, mode=Mode.PRIVATE)
    add(filete5_piece_7)
    with BuildSketch(Plane(origin=(-5, 15, 7.92), x_dir=(0, -0.7453660632826157, 0.6666554070181805), z_dir=(-1, 0, 0))) as filete5_piece_8_section:
        with BuildLine():
            CenterArc((0.389457483, 1), FILETE5_R, 228.190550632, 41.809449368)
            Line((-0.277197924, 0.254633937), (-0.343863465, 0.18009733))
            ThreePointArc((-0.343863465, 0.18009733), (-0.137775641, -0.004227619), (-0.073776551, -0.067505708))
            Line((-0.073776551, -0.067505708), (0, -0.1))
            Line((0, -0.1), (0.389457483, -0.1))
            Line((0.389457483, -0.1), (0.389457483, 0))
        make_face()
    filete5_piece_8 = extrude(amount=3.973643707, mode=Mode.PRIVATE)
    filete5_piece_8 = split(filete5_piece_8, bisect_by=Plane(origin=(-8, 15, 7.92), z_dir=(-1, 0, 0)), keep=Keep.TOP, mode=Mode.PRIVATE)
    filete5_piece_8 = split(filete5_piece_8, bisect_by=Plane(origin=(-7.919029365, 14.513535649, 7.92), z_dir=(0.9863961453920427, 0.1643856573905407, 0)), keep=Keep.TOP, mode=Mode.PRIVATE)
    add(filete5_piece_8)


solid = part.part
